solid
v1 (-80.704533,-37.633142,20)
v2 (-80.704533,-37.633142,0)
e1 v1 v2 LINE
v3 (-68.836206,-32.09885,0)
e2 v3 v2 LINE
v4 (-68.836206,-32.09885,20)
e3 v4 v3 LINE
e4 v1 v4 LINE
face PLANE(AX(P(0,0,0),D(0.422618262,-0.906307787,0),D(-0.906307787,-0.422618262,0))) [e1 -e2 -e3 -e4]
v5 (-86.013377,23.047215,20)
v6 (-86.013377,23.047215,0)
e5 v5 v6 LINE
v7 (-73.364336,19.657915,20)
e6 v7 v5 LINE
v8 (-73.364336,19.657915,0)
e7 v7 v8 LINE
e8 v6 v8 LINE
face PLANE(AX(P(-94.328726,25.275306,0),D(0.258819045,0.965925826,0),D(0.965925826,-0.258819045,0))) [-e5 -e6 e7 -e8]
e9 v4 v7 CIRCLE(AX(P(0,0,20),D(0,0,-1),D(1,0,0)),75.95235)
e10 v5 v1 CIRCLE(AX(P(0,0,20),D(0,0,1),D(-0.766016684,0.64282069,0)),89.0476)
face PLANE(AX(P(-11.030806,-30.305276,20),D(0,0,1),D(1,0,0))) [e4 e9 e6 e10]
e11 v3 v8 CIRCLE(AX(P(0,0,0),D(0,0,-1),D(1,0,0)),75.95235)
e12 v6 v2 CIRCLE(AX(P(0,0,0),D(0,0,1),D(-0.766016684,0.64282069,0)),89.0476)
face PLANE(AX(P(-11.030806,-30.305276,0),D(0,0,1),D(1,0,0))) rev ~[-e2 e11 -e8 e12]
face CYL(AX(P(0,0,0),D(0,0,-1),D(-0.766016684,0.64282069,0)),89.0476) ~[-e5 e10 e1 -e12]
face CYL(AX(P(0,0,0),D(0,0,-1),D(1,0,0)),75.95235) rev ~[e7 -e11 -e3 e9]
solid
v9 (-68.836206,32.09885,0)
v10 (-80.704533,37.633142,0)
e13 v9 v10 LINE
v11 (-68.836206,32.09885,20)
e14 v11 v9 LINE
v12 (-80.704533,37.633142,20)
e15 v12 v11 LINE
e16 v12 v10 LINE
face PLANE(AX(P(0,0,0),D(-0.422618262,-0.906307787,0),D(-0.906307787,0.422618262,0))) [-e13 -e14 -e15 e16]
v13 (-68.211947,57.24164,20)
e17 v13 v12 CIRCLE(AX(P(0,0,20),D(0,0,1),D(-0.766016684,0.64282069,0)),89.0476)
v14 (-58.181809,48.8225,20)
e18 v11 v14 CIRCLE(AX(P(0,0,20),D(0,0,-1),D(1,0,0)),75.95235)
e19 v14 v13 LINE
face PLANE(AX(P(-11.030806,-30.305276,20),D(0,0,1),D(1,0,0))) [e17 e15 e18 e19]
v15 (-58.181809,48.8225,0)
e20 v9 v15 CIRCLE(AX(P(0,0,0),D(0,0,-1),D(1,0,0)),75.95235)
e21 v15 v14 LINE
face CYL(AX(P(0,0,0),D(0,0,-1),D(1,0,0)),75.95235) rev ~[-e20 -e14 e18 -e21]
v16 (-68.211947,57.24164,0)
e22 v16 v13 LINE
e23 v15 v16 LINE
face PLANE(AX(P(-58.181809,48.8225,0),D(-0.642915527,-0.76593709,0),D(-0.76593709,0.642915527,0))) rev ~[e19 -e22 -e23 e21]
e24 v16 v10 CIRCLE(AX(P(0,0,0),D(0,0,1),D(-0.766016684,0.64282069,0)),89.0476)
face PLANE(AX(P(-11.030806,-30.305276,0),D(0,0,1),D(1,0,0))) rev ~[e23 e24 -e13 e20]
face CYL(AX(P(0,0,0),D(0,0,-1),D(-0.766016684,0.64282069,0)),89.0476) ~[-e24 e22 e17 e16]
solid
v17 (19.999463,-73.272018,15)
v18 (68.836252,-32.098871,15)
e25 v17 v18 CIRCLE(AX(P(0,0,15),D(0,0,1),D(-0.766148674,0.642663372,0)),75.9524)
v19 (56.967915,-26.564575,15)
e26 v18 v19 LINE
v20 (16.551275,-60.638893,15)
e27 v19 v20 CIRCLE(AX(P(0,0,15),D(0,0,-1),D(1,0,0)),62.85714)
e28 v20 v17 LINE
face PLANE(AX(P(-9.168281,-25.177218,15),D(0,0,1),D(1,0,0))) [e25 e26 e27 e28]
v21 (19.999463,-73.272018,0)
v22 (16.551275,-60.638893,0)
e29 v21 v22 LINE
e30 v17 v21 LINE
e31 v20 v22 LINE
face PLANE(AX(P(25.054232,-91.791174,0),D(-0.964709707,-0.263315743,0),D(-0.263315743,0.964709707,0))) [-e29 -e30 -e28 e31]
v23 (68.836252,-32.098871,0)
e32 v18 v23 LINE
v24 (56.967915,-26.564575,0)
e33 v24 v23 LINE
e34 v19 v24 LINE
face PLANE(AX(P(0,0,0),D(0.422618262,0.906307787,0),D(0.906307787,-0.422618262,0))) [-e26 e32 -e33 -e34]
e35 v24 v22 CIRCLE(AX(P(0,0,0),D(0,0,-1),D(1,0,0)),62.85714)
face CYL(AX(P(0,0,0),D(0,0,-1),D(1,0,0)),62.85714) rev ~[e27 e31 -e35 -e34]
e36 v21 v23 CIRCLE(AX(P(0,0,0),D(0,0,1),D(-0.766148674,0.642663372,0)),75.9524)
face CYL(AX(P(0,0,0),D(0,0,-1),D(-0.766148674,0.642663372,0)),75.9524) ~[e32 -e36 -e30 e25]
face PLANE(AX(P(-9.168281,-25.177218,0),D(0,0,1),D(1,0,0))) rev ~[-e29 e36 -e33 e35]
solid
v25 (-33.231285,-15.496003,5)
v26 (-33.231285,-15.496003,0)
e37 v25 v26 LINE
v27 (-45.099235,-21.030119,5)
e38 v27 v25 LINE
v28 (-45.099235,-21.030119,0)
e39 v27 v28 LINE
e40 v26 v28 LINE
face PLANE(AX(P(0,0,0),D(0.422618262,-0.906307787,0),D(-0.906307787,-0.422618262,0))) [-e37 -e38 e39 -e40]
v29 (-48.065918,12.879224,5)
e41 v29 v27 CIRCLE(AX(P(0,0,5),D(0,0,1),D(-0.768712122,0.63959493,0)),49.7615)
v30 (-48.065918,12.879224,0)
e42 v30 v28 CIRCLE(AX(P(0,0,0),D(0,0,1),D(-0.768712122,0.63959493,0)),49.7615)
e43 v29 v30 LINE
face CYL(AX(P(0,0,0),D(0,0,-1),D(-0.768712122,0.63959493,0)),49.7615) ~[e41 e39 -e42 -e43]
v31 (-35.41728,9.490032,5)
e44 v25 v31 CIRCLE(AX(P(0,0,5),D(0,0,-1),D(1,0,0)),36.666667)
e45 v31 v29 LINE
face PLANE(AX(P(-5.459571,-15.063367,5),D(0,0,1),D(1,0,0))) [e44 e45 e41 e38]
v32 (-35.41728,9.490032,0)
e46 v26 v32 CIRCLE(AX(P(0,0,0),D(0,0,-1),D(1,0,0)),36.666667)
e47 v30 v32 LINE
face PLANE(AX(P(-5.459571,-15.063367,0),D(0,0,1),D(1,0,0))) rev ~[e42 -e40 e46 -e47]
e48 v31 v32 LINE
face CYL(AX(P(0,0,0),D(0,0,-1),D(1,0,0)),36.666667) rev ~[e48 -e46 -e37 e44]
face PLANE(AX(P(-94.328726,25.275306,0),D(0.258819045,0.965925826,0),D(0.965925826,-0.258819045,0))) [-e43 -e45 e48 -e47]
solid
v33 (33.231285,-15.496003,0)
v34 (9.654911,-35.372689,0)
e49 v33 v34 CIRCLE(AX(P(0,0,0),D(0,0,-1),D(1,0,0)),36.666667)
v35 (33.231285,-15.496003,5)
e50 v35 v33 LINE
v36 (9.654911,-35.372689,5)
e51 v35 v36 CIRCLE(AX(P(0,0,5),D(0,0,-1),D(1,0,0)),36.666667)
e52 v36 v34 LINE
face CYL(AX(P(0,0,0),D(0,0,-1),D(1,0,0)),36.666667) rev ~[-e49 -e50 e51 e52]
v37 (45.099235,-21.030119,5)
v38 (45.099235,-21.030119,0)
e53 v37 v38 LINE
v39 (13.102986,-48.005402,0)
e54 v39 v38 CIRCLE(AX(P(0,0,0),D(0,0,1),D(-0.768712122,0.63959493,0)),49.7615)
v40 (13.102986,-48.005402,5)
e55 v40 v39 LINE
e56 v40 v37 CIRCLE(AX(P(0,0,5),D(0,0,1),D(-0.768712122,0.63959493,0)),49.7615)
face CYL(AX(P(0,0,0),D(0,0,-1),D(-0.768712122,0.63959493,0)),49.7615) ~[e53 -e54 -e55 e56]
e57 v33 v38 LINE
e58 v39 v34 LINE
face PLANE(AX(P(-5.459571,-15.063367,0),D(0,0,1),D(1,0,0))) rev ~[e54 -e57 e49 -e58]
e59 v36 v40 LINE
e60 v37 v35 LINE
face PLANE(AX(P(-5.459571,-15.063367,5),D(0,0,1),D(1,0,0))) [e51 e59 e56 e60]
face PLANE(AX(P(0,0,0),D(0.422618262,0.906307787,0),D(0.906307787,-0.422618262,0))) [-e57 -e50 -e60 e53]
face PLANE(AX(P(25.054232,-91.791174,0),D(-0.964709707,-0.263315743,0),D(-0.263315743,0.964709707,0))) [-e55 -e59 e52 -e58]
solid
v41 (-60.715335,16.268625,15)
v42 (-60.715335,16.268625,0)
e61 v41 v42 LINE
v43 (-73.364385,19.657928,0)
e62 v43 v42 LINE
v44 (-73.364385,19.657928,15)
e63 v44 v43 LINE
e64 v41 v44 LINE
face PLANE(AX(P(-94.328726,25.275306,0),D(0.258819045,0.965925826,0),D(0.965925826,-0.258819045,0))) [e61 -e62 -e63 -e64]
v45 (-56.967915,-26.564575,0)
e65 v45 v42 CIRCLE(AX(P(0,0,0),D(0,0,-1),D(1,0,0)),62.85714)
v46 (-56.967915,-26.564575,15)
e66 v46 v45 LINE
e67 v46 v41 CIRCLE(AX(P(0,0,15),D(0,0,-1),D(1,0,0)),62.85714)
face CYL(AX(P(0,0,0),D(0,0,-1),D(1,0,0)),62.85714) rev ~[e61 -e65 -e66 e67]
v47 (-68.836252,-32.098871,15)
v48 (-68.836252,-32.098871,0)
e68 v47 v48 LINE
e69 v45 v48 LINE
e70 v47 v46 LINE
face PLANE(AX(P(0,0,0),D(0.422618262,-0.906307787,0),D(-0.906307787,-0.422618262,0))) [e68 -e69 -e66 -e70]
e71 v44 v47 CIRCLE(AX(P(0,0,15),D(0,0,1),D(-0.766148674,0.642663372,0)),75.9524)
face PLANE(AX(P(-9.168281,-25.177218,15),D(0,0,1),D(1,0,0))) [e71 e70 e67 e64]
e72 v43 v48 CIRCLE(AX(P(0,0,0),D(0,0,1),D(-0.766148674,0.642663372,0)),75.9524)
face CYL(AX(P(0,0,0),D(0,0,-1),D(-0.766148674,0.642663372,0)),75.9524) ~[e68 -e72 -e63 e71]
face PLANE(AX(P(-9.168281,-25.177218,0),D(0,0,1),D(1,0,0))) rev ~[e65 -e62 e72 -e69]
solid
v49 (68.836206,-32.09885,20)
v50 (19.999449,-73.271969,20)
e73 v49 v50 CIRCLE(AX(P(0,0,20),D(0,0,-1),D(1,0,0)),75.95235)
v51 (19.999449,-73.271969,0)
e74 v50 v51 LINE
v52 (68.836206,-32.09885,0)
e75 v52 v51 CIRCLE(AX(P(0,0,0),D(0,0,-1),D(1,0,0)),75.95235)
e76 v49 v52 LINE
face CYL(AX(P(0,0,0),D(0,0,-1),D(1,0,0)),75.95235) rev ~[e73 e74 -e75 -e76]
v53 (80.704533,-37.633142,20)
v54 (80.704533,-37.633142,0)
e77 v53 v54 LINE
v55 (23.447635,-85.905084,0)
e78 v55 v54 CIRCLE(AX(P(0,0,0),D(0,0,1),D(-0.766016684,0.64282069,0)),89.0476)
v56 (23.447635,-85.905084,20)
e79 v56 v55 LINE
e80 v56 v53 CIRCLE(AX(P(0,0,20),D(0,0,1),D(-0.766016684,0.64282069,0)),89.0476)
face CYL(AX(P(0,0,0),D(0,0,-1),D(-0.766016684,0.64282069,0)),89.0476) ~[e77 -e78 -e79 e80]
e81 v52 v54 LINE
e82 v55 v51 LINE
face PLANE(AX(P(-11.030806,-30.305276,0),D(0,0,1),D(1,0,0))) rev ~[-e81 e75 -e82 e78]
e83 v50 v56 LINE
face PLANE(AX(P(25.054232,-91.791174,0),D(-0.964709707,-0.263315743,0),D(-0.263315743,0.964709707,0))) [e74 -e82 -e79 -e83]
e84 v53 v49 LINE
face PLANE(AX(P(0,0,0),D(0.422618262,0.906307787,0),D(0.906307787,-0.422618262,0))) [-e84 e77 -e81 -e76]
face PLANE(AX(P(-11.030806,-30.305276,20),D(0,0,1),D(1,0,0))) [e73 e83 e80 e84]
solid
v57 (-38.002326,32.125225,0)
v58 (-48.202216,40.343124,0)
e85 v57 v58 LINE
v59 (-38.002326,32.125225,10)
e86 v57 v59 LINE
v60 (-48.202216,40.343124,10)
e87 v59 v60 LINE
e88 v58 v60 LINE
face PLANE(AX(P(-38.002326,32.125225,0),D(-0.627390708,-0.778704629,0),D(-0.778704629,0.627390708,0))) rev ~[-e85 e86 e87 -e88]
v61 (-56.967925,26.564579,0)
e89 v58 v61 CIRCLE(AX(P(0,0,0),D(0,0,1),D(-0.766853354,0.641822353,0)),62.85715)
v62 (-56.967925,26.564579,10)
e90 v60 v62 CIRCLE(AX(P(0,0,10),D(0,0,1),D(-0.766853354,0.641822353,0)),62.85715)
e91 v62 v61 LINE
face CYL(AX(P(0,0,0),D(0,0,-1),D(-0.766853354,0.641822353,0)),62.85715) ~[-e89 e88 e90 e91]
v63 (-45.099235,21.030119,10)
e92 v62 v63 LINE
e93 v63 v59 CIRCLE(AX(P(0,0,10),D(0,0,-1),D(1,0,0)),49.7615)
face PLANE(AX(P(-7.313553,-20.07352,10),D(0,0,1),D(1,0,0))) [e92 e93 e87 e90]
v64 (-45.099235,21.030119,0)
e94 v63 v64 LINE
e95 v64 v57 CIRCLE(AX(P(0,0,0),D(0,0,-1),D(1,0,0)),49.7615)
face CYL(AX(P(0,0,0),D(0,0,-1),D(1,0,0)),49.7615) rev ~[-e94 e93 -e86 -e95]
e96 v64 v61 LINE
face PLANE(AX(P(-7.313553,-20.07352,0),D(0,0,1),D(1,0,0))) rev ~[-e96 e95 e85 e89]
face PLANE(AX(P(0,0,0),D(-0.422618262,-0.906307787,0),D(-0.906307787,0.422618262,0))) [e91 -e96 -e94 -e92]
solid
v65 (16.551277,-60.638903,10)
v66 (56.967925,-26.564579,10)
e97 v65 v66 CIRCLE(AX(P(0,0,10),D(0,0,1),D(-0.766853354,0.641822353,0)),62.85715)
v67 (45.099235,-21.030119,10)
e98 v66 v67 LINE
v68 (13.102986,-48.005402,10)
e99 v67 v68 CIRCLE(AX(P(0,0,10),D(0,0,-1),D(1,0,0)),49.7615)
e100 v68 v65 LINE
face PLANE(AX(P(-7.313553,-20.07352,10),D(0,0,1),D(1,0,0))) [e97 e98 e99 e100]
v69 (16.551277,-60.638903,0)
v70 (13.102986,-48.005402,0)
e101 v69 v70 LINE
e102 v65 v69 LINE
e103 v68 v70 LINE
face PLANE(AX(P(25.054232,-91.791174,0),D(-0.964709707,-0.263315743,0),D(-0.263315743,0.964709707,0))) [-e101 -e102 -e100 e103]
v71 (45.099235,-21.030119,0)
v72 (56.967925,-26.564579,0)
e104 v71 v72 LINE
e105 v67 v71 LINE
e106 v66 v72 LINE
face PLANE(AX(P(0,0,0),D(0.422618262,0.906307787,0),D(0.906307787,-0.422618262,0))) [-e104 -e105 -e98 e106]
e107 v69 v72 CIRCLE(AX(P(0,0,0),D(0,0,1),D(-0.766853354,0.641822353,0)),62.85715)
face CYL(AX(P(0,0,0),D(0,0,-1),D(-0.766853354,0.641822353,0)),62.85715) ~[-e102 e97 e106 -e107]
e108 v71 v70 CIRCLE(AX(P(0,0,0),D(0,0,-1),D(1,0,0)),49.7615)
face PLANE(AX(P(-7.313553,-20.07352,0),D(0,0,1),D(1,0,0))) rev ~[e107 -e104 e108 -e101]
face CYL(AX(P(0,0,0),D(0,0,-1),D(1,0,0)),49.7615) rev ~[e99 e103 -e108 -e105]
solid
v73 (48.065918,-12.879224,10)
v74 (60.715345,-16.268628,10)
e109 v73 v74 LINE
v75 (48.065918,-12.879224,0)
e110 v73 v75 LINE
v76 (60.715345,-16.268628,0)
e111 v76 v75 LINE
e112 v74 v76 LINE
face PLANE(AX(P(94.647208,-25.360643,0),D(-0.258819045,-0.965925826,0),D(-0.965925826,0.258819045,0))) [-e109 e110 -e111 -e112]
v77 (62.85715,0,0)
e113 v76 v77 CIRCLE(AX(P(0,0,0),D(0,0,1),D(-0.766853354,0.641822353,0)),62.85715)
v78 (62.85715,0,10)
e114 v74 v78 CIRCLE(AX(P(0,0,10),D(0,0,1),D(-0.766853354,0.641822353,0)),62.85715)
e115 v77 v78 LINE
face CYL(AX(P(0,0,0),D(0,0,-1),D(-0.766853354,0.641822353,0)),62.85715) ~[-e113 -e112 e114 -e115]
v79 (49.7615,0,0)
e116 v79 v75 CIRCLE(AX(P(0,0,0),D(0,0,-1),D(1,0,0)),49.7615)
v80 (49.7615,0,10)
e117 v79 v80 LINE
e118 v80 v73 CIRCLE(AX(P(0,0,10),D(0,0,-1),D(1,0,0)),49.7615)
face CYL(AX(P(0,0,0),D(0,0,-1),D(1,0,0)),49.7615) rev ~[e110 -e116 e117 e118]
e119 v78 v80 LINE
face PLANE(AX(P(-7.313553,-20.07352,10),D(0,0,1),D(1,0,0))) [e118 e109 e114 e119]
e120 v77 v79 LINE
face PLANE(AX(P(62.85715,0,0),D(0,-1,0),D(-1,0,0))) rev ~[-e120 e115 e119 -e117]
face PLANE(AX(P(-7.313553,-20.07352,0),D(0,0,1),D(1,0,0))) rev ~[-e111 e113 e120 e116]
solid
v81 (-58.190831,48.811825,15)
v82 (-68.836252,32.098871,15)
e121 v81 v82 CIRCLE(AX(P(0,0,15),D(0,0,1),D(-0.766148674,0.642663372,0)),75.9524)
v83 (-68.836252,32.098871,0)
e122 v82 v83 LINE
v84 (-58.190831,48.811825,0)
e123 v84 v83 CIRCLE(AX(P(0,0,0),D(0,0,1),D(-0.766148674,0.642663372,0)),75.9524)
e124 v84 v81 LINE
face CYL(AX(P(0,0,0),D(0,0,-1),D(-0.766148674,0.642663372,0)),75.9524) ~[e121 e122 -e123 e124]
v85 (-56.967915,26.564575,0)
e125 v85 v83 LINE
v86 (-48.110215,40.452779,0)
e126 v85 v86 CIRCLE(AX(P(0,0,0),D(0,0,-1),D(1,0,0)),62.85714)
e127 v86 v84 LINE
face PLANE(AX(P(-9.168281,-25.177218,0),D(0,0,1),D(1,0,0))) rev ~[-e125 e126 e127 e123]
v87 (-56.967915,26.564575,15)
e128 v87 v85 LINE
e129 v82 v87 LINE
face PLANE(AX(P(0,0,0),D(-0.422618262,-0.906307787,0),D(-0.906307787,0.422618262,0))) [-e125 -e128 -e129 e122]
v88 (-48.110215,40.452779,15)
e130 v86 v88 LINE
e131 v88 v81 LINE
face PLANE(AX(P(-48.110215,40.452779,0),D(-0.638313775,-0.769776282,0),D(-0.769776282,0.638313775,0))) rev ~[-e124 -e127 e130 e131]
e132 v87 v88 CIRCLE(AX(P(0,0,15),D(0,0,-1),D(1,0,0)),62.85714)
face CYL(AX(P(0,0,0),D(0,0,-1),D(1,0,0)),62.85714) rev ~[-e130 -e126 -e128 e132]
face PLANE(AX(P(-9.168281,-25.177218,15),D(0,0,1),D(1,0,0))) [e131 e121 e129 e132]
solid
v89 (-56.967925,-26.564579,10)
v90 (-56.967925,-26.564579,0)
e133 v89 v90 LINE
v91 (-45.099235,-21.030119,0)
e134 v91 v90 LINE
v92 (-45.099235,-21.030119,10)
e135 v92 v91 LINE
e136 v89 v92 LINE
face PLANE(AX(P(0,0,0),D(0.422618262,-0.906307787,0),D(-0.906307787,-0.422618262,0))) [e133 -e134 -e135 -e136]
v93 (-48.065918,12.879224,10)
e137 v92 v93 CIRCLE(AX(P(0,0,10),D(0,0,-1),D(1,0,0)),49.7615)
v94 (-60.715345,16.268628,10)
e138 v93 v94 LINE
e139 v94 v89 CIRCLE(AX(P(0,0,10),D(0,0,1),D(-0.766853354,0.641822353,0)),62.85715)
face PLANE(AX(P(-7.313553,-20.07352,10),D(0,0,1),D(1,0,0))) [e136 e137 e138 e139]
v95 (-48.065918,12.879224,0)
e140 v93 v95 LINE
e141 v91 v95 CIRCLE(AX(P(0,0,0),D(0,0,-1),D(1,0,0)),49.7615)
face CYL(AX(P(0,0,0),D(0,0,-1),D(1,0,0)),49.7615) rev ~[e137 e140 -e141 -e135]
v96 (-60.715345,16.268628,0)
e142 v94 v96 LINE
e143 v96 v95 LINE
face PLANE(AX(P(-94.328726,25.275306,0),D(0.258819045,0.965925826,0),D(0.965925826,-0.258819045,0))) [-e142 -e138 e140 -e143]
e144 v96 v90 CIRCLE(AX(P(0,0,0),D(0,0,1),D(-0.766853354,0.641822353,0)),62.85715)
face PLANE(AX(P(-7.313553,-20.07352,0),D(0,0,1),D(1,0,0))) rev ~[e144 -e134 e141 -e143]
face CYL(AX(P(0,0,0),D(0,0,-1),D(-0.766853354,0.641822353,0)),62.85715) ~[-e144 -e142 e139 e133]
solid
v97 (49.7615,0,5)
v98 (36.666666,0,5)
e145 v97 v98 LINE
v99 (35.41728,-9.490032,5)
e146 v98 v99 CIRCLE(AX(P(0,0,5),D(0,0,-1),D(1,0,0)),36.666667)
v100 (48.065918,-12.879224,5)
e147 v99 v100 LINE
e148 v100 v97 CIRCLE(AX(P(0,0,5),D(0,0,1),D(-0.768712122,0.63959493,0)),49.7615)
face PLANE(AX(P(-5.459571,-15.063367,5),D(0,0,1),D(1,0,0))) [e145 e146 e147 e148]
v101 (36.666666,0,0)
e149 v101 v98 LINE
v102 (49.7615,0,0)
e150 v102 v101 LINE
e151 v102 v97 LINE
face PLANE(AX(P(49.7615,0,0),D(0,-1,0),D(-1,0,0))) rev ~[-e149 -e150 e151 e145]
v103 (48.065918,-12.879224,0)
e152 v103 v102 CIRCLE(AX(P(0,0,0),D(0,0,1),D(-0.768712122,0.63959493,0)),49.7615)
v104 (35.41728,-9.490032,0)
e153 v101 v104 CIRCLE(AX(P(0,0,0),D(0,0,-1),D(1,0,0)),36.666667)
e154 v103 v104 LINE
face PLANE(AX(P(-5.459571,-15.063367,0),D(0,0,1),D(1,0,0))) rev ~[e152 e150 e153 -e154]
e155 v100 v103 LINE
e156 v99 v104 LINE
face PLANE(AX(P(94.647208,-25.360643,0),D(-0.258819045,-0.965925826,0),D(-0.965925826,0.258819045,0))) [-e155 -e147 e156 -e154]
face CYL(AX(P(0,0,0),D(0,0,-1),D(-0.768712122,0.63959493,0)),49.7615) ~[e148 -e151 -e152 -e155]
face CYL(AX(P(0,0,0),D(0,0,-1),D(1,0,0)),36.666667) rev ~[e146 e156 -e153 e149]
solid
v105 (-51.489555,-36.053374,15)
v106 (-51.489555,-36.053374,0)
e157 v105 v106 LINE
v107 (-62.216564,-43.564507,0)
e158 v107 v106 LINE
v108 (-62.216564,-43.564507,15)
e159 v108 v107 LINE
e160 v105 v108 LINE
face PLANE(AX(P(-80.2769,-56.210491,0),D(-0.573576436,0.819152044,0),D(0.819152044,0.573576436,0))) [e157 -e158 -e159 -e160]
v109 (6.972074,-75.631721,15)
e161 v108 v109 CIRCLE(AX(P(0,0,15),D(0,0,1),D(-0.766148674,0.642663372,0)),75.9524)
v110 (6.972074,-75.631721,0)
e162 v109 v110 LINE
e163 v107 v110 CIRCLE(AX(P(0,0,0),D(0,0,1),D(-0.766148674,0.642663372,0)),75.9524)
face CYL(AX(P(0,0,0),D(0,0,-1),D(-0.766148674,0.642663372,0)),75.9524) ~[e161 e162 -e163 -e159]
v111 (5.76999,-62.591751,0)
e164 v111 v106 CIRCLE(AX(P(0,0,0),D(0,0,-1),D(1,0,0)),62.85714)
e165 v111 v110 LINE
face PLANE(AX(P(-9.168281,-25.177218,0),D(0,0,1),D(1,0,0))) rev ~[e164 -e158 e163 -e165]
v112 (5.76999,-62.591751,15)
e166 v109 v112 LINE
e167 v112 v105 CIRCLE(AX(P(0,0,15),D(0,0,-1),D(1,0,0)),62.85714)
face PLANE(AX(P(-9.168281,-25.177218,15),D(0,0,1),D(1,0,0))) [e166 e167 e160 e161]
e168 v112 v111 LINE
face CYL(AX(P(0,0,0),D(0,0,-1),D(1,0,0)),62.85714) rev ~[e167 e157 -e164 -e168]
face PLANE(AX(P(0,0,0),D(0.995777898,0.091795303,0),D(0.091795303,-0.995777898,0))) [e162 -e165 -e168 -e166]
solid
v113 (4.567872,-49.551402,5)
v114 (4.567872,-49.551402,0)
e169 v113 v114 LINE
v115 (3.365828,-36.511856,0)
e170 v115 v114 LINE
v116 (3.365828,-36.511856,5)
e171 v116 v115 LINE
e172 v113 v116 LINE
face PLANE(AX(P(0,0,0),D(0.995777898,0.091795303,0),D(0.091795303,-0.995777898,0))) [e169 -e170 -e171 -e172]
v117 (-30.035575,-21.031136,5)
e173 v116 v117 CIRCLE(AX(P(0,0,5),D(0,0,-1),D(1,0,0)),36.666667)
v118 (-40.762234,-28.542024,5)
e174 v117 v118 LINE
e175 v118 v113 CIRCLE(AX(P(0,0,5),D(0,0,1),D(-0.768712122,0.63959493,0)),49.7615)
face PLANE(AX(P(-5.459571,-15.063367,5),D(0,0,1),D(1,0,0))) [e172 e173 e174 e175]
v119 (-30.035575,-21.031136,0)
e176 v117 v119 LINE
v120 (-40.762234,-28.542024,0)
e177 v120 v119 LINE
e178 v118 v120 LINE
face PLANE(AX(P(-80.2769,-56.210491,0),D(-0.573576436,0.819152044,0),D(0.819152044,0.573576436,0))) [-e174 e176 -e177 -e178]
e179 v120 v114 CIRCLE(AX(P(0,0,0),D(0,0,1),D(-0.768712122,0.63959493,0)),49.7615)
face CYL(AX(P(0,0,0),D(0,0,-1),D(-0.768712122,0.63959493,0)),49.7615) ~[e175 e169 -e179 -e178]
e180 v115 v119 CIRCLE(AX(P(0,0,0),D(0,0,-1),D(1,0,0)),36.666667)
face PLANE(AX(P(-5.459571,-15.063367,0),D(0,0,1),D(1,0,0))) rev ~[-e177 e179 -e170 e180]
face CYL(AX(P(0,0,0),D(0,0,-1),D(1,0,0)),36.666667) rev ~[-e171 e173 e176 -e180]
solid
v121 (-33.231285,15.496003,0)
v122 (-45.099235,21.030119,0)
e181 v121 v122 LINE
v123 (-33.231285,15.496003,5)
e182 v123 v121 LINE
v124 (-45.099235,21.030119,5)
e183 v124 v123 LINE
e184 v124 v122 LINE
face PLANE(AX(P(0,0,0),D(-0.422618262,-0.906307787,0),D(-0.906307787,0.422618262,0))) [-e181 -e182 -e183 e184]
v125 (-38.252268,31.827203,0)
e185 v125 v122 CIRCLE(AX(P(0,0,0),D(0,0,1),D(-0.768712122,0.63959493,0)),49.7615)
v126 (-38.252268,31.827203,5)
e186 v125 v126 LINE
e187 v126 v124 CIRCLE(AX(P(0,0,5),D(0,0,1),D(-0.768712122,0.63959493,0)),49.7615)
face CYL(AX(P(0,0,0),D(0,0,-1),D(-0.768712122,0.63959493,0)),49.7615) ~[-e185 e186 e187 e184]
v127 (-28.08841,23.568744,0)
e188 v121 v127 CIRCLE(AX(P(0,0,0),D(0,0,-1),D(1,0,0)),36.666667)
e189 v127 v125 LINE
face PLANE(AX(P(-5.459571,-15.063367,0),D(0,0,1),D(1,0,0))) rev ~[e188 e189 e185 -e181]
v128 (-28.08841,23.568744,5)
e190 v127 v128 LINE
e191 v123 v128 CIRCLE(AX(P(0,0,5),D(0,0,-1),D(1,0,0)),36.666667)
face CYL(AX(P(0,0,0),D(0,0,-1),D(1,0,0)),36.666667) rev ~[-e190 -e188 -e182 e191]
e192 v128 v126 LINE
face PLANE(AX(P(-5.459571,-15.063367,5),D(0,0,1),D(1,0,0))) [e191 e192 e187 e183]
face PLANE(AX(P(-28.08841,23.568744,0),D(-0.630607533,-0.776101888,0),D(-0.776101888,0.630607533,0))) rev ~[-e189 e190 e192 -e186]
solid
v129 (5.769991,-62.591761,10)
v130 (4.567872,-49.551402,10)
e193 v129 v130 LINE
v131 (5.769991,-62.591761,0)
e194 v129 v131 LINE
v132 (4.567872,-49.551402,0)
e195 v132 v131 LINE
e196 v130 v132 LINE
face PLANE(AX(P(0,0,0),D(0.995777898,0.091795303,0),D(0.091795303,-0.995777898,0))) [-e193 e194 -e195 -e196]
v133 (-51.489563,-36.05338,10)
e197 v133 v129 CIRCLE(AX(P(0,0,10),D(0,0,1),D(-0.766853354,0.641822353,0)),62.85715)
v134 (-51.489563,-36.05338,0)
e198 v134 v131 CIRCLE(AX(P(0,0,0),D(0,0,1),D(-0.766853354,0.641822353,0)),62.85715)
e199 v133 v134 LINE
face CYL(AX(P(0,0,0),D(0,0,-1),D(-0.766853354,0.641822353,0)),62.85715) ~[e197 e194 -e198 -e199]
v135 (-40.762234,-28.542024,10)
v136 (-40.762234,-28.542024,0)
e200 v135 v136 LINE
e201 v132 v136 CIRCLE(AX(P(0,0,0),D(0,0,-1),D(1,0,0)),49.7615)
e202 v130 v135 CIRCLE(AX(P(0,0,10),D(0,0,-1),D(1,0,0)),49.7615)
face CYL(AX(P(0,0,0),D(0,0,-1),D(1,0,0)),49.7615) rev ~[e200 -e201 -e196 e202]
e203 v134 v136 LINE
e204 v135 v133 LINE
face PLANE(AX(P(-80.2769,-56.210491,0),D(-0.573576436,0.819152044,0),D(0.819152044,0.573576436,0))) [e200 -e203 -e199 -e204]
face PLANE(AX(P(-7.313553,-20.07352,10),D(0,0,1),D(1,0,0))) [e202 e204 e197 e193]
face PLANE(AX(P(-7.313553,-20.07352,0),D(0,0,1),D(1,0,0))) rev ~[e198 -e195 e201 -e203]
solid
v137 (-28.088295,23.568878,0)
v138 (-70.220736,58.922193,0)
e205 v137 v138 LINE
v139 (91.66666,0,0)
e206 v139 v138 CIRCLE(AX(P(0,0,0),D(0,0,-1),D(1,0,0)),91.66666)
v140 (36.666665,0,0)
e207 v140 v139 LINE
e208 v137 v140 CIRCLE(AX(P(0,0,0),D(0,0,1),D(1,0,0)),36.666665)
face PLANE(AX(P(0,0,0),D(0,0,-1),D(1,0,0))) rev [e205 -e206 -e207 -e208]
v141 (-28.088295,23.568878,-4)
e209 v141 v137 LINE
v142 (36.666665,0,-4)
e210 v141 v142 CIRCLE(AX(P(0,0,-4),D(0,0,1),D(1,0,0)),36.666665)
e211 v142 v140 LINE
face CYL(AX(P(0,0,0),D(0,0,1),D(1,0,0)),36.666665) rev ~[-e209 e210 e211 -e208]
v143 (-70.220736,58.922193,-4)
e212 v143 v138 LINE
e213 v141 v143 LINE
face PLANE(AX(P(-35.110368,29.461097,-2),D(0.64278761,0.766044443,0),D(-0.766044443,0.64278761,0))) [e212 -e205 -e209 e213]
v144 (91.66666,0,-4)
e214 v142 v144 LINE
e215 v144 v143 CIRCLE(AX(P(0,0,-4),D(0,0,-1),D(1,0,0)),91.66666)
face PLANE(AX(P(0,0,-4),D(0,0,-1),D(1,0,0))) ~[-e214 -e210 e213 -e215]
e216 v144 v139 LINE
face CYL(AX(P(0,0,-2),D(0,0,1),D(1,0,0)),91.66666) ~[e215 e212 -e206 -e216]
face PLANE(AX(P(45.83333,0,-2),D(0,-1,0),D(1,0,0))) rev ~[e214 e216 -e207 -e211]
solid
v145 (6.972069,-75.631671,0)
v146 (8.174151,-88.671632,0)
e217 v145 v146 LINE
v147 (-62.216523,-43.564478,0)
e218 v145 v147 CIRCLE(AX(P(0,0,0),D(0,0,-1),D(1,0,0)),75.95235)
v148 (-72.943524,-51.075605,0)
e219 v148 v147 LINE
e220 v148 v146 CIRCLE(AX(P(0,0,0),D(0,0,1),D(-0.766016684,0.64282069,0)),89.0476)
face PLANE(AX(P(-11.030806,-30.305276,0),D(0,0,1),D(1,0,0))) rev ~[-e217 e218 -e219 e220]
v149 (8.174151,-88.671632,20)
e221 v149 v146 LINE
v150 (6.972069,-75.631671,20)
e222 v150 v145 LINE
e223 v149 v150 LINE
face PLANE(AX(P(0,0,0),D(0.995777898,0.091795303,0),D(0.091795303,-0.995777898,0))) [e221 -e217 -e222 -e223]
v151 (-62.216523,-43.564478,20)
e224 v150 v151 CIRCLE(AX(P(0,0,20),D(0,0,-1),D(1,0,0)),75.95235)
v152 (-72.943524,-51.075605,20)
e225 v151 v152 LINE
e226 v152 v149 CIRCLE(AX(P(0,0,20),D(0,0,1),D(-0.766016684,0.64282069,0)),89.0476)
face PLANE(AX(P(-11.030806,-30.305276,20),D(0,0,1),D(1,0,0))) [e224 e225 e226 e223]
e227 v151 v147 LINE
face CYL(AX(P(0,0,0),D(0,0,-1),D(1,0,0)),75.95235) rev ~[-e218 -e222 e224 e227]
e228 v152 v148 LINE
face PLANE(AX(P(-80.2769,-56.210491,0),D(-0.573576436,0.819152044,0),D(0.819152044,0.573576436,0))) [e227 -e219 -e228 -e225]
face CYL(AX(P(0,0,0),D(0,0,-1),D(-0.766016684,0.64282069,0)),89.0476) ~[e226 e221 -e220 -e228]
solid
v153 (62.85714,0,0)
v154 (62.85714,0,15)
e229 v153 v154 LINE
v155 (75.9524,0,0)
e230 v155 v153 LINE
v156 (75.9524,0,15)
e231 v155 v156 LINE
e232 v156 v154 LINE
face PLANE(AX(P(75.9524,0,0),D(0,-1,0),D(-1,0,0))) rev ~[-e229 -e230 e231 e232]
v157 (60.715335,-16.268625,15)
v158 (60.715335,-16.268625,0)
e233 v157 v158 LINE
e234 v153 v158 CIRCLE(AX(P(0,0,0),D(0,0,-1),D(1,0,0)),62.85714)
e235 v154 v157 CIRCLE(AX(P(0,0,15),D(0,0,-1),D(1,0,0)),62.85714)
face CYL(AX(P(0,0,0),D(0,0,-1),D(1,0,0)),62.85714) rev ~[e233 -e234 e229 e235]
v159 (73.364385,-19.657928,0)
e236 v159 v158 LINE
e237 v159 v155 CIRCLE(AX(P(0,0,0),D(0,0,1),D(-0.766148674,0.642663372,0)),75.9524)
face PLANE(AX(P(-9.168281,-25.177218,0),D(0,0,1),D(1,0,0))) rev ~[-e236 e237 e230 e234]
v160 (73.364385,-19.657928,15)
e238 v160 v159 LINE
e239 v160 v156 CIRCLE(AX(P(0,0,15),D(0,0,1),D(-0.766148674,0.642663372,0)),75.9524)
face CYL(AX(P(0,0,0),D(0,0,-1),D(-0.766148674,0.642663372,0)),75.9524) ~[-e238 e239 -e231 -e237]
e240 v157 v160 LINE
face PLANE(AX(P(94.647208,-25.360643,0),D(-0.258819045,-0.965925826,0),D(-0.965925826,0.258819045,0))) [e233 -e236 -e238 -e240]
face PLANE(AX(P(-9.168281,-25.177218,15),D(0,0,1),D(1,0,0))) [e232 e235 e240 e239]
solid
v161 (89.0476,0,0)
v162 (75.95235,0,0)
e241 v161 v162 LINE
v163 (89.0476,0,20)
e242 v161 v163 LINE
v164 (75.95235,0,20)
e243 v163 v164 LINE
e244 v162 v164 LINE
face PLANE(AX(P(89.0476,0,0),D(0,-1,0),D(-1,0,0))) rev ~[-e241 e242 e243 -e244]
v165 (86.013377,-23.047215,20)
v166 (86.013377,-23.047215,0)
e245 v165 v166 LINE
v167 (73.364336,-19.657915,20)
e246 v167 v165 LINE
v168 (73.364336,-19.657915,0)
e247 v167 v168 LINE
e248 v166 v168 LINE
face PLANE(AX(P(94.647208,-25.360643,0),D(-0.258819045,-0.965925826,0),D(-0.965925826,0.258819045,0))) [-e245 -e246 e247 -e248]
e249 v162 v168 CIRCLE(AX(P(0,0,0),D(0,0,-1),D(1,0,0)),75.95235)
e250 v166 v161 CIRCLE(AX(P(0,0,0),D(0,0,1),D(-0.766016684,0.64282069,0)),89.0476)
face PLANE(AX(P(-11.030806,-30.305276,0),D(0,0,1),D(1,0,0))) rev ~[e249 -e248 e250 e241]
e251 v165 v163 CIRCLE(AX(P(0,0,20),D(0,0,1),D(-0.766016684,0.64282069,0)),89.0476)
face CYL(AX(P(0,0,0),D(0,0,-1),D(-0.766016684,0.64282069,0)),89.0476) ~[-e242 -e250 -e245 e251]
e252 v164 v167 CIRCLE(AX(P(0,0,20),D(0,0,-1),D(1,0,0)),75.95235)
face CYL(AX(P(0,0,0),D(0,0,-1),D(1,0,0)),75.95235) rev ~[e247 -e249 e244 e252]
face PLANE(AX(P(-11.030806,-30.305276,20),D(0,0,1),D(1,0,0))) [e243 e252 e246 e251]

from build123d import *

# Parameters (mm, degrees)
F0_W      = 91.66666
F0_H      = 4
F1_ANGLE  = 220
F2_R      = 36.666665
F3_DEPTH  = 12.5
F5_DEPTH  = 5
F7_DEPTH  = 10
F9_DEPTH  = 15
F11_DEPTH = 20
F13_DEPTH = 29
F15_DEPTH = 25


with BuildPart() as f1:
    # F0 (on Front) → F1 (revolve)
    with BuildSketch(Plane.XZ):
        with Locations((45.83333, -2)):
            Rectangle(F0_W, F0_H)
    revolve(axis=Axis((0, 0, -2), (0, 0, -1)), revolution_arc=F1_ANGLE)

    # F2 (on Top) → F3 (cut, symmetric)
    with BuildSketch(Plane.XY):
        Circle(F2_R)
    extrude(amount=F3_DEPTH, both=True, mode=Mode.SUBTRACT)


with BuildPart() as f5:
    # F4 (on Top) → F5 (new body)
    with BuildSketch(Plane.XY):
        with BuildLine():
            ThreePointArc((36.6666665, 0), (-12.540655641, -34.4554261085), (-28.0884095207, 23.5687437684))
            Line((-28.0884095207, 23.5687437684), (-38.2522682412, 31.827203092))
            ThreePointArc((-38.2522682412, 31.827203092), (-16.9221251054, -46.7958178064), (49.7615, 0))
            Line((49.7615, 0), (36.6666665, 0))
        make_face()
    extrude(amount=F5_DEPTH)


with BuildPart() as f7:
    # F6 (on Top) → F7 (new body)
    with BuildSketch(Plane.XY):
        with BuildLine():
            ThreePointArc((49.7615, 0), (-17.1048840177, -46.7293251074), (-38.0023264518, 32.1252247696))
            Line((-38.0023264518, 32.1252247696), (-48.2022163099, 40.3431239363))
            ThreePointArc((-48.2022163099, 40.3431239363), (-21.4612134466, -59.0799257237), (62.85715, 0))
            Line((62.85715, 0), (49.7615, 0))
        make_face()
    extrude(amount=F7_DEPTH)


with BuildPart() as f9:
    # F8 (on Top) → F9 (new body)
    with BuildSketch(Plane.XY):
        with BuildLine():
            Line((-48.1102146254, 40.452778615), (-58.190830552, 48.8118254671))
            ThreePointArc((-58.190830552, 48.8118254671), (-25.9714634488, -71.3740159448), (75.9524, 0))
            Line((75.9524, 0), (62.85714, 0))
            ThreePointArc((62.85714, 0), (-21.5284643303, -59.0554423619), (-48.1102146254, 40.452778615))
        make_face()
    extrude(amount=F9_DEPTH)


with BuildPart() as f11:
    # F10 (on Top) → F11 (new body)
    with BuildSketch(Plane.XY):
        with BuildLine():
            ThreePointArc((75.95235, 0), (-25.9780129339, -71.3715791792), (-58.1818094968, 48.8225000814))
            Line((-58.1818094968, 48.8225000814), (-68.2119472637, 57.2416397061))
            ThreePointArc((-68.2119472637, 57.2416397061), (-30.4578796914, -83.6767149837), (89.0476, 0))
            Line((89.0476, 0), (75.95235, 0))
        make_face()
    extrude(amount=F11_DEPTH)


with BuildPart() as f13_tool:
    # F12 (on Top) → F13 (new body)
    with BuildSketch(Plane.XY):
        Polygon((94.6472080148, -25.3606429534), (0, 0), (88.5066497486, -41.2713285754), align=None)
        Polygon((-94.3287258626, 25.2753059179), (0, 0), (-88.8055123304, 41.4106904861), align=None)
    extrude(amount=F13_DEPTH)


with BuildPart() as f5_1:
    add(f5.part)

    # F13: cut by f13_tool
    add(f13_tool.part, mode=Mode.SUBTRACT)


with BuildPart() as f7_1:
    add(f7.part)

    # F13: cut by f13_tool
    add(f13_tool.part, mode=Mode.SUBTRACT)


with BuildPart() as f9_1:
    add(f9.part)

    # F13: cut by f13_tool
    add(f13_tool.part, mode=Mode.SUBTRACT)


with BuildPart() as f11_1:
    add(f11.part)

    # F13: cut by f13_tool
    add(f13_tool.part, mode=Mode.SUBTRACT)


with BuildPart() as f15_tool:
    # F14 (on Top) → F15 (new body)
    with BuildSketch(Plane.XY):
        Polygon((-80.2769003403, -56.2104907624), (0, 0), (-88.8181631296, -41.4165896506), align=None)
        Polygon((25.0542324687, -91.7911742938), (0, 0), (8.8207321241, -95.6856161356), align=None)
    extrude(amount=F15_DEPTH)


with BuildPart() as f5_2:
    add(f5_1.part)

    # F15: cut by f15_tool
    add(f15_tool.part, mode=Mode.SUBTRACT)


with BuildPart() as f7_2:
    add(f7_1.part)

    # F15: cut by f15_tool
    add(f15_tool.part, mode=Mode.SUBTRACT)


with BuildPart() as f9_2:
    add(f9_1.part)

    # F15: cut by f15_tool
    add(f15_tool.part, mode=Mode.SUBTRACT)


with BuildPart() as f11_2:
    add(f11_1.part)

    # F15: cut by f15_tool
    add(f15_tool.part, mode=Mode.SUBTRACT)


solid = Compound([f1.part, f5_2.part, f7_2.part, f9_2.part, f11_2.part])
